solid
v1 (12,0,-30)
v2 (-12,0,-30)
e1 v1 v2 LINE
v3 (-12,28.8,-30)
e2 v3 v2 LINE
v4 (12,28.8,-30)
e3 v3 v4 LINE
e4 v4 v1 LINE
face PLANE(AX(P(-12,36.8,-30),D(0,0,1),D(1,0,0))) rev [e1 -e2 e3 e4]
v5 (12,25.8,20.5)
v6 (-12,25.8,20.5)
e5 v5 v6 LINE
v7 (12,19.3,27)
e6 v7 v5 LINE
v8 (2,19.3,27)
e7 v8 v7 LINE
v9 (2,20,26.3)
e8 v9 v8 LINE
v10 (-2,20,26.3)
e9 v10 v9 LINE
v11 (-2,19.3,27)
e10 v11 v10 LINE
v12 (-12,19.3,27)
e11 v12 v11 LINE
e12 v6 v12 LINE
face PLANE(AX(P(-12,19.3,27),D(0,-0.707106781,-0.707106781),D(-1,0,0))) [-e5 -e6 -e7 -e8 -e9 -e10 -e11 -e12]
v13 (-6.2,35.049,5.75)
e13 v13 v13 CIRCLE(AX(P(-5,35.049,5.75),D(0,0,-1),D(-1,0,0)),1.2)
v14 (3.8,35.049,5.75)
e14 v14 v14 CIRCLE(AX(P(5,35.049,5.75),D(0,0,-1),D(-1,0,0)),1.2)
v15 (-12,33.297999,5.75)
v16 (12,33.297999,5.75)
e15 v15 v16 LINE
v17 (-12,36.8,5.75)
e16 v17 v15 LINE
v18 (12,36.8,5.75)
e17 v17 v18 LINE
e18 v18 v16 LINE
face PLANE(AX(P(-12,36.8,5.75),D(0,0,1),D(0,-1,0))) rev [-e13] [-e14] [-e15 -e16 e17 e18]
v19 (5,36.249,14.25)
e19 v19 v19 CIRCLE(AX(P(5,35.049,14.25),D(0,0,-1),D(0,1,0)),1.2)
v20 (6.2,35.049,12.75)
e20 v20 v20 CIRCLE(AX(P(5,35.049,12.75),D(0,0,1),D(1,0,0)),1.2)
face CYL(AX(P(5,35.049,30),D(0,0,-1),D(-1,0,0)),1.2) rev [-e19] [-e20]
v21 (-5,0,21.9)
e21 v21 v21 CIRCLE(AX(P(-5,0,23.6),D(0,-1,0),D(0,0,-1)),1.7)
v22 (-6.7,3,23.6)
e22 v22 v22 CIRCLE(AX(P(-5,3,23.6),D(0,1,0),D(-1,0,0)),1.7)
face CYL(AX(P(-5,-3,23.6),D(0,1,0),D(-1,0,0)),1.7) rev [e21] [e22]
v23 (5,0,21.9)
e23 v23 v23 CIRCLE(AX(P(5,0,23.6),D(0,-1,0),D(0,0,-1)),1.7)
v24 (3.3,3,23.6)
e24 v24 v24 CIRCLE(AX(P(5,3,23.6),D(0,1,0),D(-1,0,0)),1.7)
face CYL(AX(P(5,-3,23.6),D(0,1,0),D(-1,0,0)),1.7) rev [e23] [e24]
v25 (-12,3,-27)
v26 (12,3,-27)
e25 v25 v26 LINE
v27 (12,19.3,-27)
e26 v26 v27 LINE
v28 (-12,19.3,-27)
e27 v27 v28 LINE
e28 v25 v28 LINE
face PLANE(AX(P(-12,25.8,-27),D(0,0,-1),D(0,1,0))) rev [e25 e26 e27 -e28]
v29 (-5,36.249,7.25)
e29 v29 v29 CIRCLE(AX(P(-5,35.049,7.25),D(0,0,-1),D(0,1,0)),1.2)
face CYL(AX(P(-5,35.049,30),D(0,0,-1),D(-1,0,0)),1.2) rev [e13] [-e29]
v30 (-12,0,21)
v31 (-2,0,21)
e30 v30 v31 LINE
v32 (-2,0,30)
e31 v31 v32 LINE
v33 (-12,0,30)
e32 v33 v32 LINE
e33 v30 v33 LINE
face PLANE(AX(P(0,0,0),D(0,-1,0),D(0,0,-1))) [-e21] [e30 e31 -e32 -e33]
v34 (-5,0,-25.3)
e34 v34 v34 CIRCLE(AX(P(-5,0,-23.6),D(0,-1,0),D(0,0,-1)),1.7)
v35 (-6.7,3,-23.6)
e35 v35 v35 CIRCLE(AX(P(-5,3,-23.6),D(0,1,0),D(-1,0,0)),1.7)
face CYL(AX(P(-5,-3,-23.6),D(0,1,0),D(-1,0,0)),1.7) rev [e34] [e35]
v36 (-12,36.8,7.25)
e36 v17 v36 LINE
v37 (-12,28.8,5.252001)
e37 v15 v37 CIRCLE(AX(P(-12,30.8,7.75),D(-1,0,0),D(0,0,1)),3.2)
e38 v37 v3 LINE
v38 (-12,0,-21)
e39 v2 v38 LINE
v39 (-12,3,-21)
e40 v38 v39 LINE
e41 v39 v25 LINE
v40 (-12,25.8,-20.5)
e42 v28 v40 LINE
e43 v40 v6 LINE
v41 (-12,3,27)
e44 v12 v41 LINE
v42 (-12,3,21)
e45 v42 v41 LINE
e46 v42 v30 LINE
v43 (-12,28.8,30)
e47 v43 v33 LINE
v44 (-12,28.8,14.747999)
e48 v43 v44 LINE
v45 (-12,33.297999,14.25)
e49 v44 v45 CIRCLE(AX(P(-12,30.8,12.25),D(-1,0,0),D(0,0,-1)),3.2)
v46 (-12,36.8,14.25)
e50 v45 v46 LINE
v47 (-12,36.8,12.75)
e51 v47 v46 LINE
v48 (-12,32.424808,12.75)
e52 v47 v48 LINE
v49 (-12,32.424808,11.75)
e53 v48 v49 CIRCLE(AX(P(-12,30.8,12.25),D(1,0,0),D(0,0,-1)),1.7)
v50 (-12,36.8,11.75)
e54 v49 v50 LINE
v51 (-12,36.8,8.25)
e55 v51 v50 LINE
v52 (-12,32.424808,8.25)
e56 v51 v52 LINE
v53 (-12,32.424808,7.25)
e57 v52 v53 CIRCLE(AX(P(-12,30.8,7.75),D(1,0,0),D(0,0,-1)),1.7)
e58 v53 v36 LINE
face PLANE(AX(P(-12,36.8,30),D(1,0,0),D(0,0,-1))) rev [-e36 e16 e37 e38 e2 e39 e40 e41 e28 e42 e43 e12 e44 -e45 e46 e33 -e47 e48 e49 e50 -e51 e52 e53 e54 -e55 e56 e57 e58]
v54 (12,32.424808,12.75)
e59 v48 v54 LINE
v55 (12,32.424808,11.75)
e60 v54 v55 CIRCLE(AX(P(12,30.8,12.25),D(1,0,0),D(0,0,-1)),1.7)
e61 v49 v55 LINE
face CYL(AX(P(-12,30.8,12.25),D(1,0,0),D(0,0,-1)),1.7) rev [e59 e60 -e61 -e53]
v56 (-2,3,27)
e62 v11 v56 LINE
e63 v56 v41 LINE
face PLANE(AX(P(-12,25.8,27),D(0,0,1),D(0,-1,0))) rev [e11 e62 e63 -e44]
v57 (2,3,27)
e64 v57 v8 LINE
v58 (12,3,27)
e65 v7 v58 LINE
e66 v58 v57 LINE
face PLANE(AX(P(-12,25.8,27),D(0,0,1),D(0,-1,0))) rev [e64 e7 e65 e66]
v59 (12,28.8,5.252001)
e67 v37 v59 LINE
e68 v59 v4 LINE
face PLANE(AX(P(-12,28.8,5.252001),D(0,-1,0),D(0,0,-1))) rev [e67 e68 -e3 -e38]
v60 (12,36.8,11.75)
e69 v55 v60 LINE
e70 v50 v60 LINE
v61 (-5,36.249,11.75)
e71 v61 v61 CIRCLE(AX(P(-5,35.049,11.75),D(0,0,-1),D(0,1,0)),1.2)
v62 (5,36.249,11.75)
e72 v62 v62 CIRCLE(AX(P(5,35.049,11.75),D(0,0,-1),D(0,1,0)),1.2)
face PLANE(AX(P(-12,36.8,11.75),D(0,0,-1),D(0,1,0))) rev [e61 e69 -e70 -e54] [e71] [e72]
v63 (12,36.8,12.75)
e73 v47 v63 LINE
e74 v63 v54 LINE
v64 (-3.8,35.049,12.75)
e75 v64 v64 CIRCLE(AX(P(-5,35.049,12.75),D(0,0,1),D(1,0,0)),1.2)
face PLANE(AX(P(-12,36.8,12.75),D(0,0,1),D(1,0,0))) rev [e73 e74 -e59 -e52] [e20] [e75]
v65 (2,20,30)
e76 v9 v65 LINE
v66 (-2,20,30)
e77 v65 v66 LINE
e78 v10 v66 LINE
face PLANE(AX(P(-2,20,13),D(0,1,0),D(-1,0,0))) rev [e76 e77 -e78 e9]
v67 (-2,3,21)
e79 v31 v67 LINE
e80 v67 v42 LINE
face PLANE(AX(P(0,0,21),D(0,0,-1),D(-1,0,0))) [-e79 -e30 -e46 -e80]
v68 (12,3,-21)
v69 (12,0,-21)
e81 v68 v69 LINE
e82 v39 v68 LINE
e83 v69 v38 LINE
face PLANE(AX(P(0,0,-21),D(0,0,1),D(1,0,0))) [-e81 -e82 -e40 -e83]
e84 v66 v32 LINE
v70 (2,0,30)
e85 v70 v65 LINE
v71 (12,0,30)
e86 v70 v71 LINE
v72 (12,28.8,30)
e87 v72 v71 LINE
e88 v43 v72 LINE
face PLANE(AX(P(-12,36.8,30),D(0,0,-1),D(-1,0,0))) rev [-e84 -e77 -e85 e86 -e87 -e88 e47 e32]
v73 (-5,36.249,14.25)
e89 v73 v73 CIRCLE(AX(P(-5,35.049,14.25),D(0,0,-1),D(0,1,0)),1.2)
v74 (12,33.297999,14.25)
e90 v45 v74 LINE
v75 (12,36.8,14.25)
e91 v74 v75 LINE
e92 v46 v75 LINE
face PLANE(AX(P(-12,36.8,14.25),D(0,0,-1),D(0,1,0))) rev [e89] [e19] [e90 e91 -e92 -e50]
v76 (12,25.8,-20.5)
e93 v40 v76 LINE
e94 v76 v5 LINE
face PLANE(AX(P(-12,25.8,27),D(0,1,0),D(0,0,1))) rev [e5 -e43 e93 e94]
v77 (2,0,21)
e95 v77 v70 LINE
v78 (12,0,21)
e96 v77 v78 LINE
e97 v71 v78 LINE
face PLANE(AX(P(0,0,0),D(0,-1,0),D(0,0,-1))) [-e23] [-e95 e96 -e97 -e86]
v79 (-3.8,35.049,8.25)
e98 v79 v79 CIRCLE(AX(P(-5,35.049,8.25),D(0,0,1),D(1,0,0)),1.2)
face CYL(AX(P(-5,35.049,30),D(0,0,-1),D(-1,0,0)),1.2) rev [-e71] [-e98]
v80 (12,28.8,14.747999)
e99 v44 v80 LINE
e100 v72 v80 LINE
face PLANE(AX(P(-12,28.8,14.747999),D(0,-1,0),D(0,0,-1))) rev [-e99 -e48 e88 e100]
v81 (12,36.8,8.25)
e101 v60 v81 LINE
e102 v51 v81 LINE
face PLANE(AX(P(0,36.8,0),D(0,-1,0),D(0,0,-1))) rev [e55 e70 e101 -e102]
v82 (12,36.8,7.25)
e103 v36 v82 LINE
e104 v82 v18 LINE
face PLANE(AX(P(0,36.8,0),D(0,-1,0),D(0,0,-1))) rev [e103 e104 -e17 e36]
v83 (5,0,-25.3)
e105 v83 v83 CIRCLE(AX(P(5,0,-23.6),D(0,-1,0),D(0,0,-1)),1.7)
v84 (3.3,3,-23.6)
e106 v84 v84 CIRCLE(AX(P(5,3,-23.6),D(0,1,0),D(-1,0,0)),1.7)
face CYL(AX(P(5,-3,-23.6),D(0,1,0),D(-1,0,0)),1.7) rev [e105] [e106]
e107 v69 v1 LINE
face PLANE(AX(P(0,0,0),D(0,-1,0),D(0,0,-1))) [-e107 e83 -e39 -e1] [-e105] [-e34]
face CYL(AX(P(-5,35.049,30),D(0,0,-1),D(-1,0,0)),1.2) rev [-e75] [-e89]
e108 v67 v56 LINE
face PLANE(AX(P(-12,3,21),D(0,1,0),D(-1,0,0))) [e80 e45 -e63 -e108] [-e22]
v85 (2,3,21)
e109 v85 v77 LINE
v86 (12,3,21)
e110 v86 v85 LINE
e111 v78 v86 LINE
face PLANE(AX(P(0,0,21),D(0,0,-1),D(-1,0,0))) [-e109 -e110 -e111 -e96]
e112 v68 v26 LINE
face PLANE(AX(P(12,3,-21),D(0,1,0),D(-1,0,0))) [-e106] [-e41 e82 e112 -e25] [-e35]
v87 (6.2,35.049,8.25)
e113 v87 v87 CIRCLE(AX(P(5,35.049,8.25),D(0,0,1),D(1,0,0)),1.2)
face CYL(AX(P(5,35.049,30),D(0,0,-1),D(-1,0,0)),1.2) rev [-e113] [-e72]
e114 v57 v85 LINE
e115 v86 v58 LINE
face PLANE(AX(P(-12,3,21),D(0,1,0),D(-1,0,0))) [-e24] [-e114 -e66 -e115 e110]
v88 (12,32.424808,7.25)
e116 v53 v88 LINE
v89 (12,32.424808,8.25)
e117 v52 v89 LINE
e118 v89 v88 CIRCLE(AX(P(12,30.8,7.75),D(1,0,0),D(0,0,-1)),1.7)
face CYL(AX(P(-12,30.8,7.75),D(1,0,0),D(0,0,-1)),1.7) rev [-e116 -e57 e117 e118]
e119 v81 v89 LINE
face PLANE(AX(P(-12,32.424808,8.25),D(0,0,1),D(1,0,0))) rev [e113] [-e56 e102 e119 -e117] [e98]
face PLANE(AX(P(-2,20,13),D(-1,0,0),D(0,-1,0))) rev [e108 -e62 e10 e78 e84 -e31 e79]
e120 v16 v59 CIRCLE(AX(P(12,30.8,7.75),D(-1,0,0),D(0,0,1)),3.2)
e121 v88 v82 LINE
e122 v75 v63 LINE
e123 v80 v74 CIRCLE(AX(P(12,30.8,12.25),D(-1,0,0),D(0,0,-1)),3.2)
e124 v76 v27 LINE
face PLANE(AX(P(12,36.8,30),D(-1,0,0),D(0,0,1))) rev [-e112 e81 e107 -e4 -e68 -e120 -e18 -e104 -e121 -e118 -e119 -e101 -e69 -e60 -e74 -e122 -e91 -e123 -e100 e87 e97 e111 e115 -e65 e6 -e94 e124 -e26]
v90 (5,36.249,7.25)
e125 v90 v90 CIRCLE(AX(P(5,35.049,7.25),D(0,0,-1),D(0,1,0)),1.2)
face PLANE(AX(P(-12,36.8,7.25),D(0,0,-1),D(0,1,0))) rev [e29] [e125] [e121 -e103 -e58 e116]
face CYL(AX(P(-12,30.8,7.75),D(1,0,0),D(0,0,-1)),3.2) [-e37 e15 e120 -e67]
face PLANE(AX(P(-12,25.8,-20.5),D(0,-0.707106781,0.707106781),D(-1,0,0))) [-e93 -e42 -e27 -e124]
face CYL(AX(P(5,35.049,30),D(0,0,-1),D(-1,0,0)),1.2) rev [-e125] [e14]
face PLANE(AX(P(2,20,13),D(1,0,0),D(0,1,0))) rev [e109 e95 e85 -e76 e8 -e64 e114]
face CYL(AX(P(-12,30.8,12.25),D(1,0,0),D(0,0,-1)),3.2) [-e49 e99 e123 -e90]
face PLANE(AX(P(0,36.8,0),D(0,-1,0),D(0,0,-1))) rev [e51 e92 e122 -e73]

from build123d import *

# Parameters (mm, degrees)
SKETCH1_W           = 24
SKETCH1_H           = 60
BOSS_EXTRUDE1_DEPTH = 36.8
CUT_EXTRUDE1_DEPTH  = 54.2
CUT_EXTRUDE2_DEPTH  = 54.2
SKETCH4_R           = 1.2
CUT_EXTRUDE3_DEPTH  = 53.690630097
SKETCH5_W           = 54
SKETCH5_H           = 25.8
CUT_EXTRUDE4_DEPTH  = 54.2
SKETCH6_W           = 24
SKETCH6_H           = 3
BOSS_EXTRUDE2_DEPTH = 9
SKETCH7_W           = 24
SKETCH7_H           = 3
BOSS_EXTRUDE3_DEPTH = 9
SKETCH8_R           = 1.7
CUT_EXTRUDE5_DEPTH  = 6
SKETCH9_W           = 4
SKETCH9_H           = 20
CUT_EXTRUDE6_DEPTH  = 17
CHAMFER1_SIZE       = 6.5


with BuildPart() as part:
    # Sketch1 → Boss-Extrude1 (new body)
    with BuildSketch(Plane(origin=(0, 0, 0), x_dir=(1, 0, 0), z_dir=(0, 1, 0))):
        Rectangle(SKETCH1_W, SKETCH1_H)
    extrude(amount=BOSS_EXTRUDE1_DEPTH)

    # Sketch2 → Cut-Extrude1 (cut, through all)
    with BuildSketch(Plane(origin=(12, 0, 0), x_dir=(0, 0, -1), z_dir=(1, 0, 0))):
        with BuildLine():
            Line((-12.75, 36.8), (-12.75, 32.424807681))
            ThreePointArc((-12.75, 32.424807681), (-12.25, 29.1), (-11.75, 32.424807681))
            Line((-11.75, 32.424807681), (-11.75, 36.8))
            Line((-11.75, 36.8), (-12.75, 36.8))
        make_face()
        with BuildLine():
            Line((-8.25, 32.424807681), (-8.25, 36.8))
            Line((-8.25, 36.8), (-7.25, 36.8))
            Line((-7.25, 36.8), (-7.25, 32.424807681))
            ThreePointArc((-7.25, 32.424807681), (-7.75, 29.1), (-8.25, 32.424807681))
        make_face()
    extrude(amount=-CUT_EXTRUDE1_DEPTH, mode=Mode.SUBTRACT)

    # Sketch3 → Cut-Extrude2 (cut, through all)
    with BuildSketch(Plane(origin=(12, 0, 0), x_dir=(0, 0, -1), z_dir=(1, 0, 0))):
        with BuildLine():
            Line((-14.25, 36.8), (-14.25, 33.297999199))
            ThreePointArc((-14.25, 33.297999199), (-15.430565736, 31.152138611), (-14.747999199, 28.8))
            Line((-14.747999199, 28.8), (-30, 28.8))
            Line((-30, 28.8), (-30, 36.8))
            Line((-30, 36.8), (-14.25, 36.8))
        make_face()
        with BuildLine():
            Line((30, 28.8), (30, 36.8))
            Line((30, 36.8), (-5.75, 36.8))
            Line((-5.75, 36.8), (-5.75, 33.297999199))
            ThreePointArc((-5.75, 33.297999199), (-4.569434264, 31.152138611), (-5.252000801, 28.8))
            Line((-5.252000801, 28.8), (30, 28.8))
        make_face()
    extrude(amount=-CUT_EXTRUDE2_DEPTH, mode=Mode.SUBTRACT)

    # Sketch4 → Cut-Extrude3 (cut, through all)
    with BuildSketch(Plane(origin=(0, 0, 5.75), x_dir=(-1, 0, 0), z_dir=(0, 0, -1))):
        with Locations((-5, 35.0489996)):
            Circle(SKETCH4_R)
        with Locations((5, 35.0489996)):
            Circle(SKETCH4_R)
    extrude(amount=-CUT_EXTRUDE3_DEPTH, mode=Mode.SUBTRACT)

    # Sketch5 → Cut-Extrude4 (cut, through all)
    with BuildSketch(Plane(origin=(12, 0, 0), x_dir=(0, 0, -1), z_dir=(1, 0, 0))):
        with Locations((0, 12.9)):
            Rectangle(SKETCH5_W, SKETCH5_H)
    extrude(amount=-CUT_EXTRUDE4_DEPTH, mode=Mode.SUBTRACT)

    # Sketch6 → Boss-Extrude2 (add)
    with BuildSketch(Plane(origin=(0, 0, -30), x_dir=(-1, 0, 0), z_dir=(0, 0, -1))):
        with Locations((0, 1.5)):
            Rectangle(SKETCH6_W, SKETCH6_H)
    extrude(amount=-BOSS_EXTRUDE2_DEPTH)

    # Sketch7 → Boss-Extrude3 (add)
    with BuildSketch(Plane.XY.offset(30)):
        with Locations((0, 1.5)):
            Rectangle(SKETCH7_W, SKETCH7_H)
    extrude(amount=-BOSS_EXTRUDE3_DEPTH)

    # Sketch8 → Cut-Extrude5 (cut)
    with BuildSketch(Plane(origin=(0, 3, 0), x_dir=(1, 0, 0), z_dir=(0, 1, 0))):
        with Locations(Location((-5, 23.6, 0), (0, 0, 180))):
            Circle(SKETCH8_R)
        with Locations(Location((5, 23.6, 0), (0, 0, 180))):
            Circle(SKETCH8_R)
        with Locations(Location((-5, -23.6, 0), (0, 0, 180))):
            Circle(SKETCH8_R)
        with Locations(Location((5, -23.6, 0), (0, 0, 180))):
            Circle(SKETCH8_R)
    extrude(amount=-CUT_EXTRUDE5_DEPTH, mode=Mode.SUBTRACT)

    # Sketch9 → Cut-Extrude6 (cut)
    with BuildSketch(Plane.XY.offset(30)):
        with Locations((0, 10)):
            Rectangle(SKETCH9_W, SKETCH9_H)
    extrude(amount=-CUT_EXTRUDE6_DEPTH, mode=Mode.SUBTRACT)

    # Chamfer1
    # the kernel refuses this chamfer: 6.5 mm, written as the material it adds along each edge
    with BuildSketch(Plane(origin=(12, 25.8, -27), x_dir=(0, -0.9996219169112968, -0.027495876610587486), z_dir=(-1, 0, 0))) as chamfer1_piece_1:
        Polygon((CHAMFER1_SIZE * 0.999621916911, CHAMFER1_SIZE * 0.0274958766106), (-CHAMFER1_SIZE * 0.0274958766106, CHAMFER1_SIZE * 0.999621916911), (0, 0), align=None)
    extrude(amount=24)
    with BuildSketch(Plane(origin=(12, 25.8, 27), x_dir=(0, -0.9996219169112968, 0.027495876610586424), z_dir=(-1, 0, 0))) as chamfer1_piece_2_section:
        Polygon((CHAMFER1_SIZE * 0.999621916911, -CHAMFER1_SIZE * 0.0274958766106), (-CHAMFER1_SIZE * 0.0274958766106, -CHAMFER1_SIZE * 0.999621916911), (0, 0), align=None)
    chamfer1_piece_2 = extrude(amount=24, mode=Mode.PRIVATE)
    chamfer1_piece_2 = split(chamfer1_piece_2, bisect_by=Plane(origin=(7, 20, 26.950497718), z_dir=(0, -1, 0)), keep=Keep.TOP, mode=Mode.PRIVATE)
    chamfer1_piece_2 = split(chamfer1_piece_2, bisect_by=Plane(origin=(2, 19.670055839, 26.950497718), z_dir=(1, 0, 0)), keep=Keep.TOP, mode=Mode.PRIVATE)
    add(chamfer1_piece_2)
    with BuildSketch(Plane(origin=(12, 25.8, 27), x_dir=(0, -0.9996219169112968, 0.027495876610586424), z_dir=(-1, 0, 0))) as chamfer1_piece_3_section:
        Polygon((CHAMFER1_SIZE * 0.999621916911, -CHAMFER1_SIZE * 0.0274958766106), (-CHAMFER1_SIZE * 0.0274958766106, -CHAMFER1_SIZE * 0.999621916911), (0, 0), align=None)
    chamfer1_piece_3 = extrude(amount=24, mode=Mode.PRIVATE)
    chamfer1_piece_3 = split(chamfer1_piece_3, bisect_by=Plane(origin=(7, 20, 24.812647942), z_dir=(0, 1, 0)), keep=Keep.TOP, mode=Mode.PRIVATE)
    chamfer1_piece_3 = split(chamfer1_piece_3, bisect_by=Plane(origin=(2, 23.739513204, 24.812647942), z_dir=(1, 0, 0)), keep=Keep.TOP, mode=Mode.PRIVATE)
    add(chamfer1_piece_3)
    with BuildSketch(Plane(origin=(12, 25.8, 27), x_dir=(0, -0.9996219169112968, 0.027495876610586424), z_dir=(-1, 0, 0))) as chamfer1_piece_4_section:
        Polygon((CHAMFER1_SIZE * 0.999621916911, -CHAMFER1_SIZE * 0.0274958766106), (-CHAMFER1_SIZE * 0.0274958766106, -CHAMFER1_SIZE * 0.999621916911), (0, 0), align=None)
    chamfer1_piece_4 = extrude(amount=24, mode=Mode.PRIVATE)
    chamfer1_piece_4 = split(chamfer1_piece_4, bisect_by=Plane(origin=(-2, 23.739513204, 24.812647942), z_dir=(1, 0, 0)), keep=Keep.TOP, mode=Mode.PRIVATE)
    chamfer1_piece_4 = split(chamfer1_piece_4, bisect_by=Plane(origin=(0, 20, 24.812647942), z_dir=(0, 1, 0)), keep=Keep.TOP, mode=Mode.PRIVATE)
    chamfer1_piece_4 = split(chamfer1_piece_4, bisect_by=Plane(origin=(2, 23.739513204, 24.812647942), z_dir=(-1, 0, 0)), keep=Keep.TOP, mode=Mode.PRIVATE)
    add(chamfer1_piece_4)
    with BuildSketch(Plane(origin=(12, 25.8, 27), x_dir=(0, -0.9996219169112968, 0.027495876610586424), z_dir=(-1, 0, 0))) as chamfer1_piece_5_section:
        Polygon((CHAMFER1_SIZE * 0.999621916911, -CHAMFER1_SIZE * 0.0274958766106), (-CHAMFER1_SIZE * 0.0274958766106, -CHAMFER1_SIZE * 0.999621916911), (0, 0), align=None)
    chamfer1_piece_5 = extrude(amount=24, mode=Mode.PRIVATE)
    chamfer1_piece_5 = split(chamfer1_piece_5, bisect_by=Plane(origin=(-2, 19.670055839, 26.950497718), z_dir=(-1, 0, 0)), keep=Keep.TOP, mode=Mode.PRIVATE)
    chamfer1_piece_5 = split(chamfer1_piece_5, bisect_by=Plane(origin=(-7, 20, 26.950497718), z_dir=(0, -1, 0)), keep=Keep.TOP, mode=Mode.PRIVATE)
    add(chamfer1_piece_5)
    with BuildSketch(Plane(origin=(12, 25.8, 27), x_dir=(0, -0.9996219169112968, 0.027495876610586424), z_dir=(-1, 0, 0))) as chamfer1_piece_6_section:
        Polygon((CHAMFER1_SIZE * 0.999621916911, -CHAMFER1_SIZE * 0.0274958766106), (-CHAMFER1_SIZE * 0.0274958766106, -CHAMFER1_SIZE * 0.999621916911), (0, 0), align=None)
    chamfer1_piece_6 = extrude(amount=24, mode=Mode.PRIVATE)
    chamfer1_piece_6 = split(chamfer1_piece_6, bisect_by=Plane(origin=(-2, 23.739513204, 24.812647942), z_dir=(-1, 0, 0)), keep=Keep.TOP, mode=Mode.PRIVATE)
    chamfer1_piece_6 = split(chamfer1_piece_6, bisect_by=Plane(origin=(-7, 20, 24.812647942), z_dir=(0, 1, 0)), keep=Keep.TOP, mode=Mode.PRIVATE)
    add(chamfer1_piece_6)


solid = part.part
